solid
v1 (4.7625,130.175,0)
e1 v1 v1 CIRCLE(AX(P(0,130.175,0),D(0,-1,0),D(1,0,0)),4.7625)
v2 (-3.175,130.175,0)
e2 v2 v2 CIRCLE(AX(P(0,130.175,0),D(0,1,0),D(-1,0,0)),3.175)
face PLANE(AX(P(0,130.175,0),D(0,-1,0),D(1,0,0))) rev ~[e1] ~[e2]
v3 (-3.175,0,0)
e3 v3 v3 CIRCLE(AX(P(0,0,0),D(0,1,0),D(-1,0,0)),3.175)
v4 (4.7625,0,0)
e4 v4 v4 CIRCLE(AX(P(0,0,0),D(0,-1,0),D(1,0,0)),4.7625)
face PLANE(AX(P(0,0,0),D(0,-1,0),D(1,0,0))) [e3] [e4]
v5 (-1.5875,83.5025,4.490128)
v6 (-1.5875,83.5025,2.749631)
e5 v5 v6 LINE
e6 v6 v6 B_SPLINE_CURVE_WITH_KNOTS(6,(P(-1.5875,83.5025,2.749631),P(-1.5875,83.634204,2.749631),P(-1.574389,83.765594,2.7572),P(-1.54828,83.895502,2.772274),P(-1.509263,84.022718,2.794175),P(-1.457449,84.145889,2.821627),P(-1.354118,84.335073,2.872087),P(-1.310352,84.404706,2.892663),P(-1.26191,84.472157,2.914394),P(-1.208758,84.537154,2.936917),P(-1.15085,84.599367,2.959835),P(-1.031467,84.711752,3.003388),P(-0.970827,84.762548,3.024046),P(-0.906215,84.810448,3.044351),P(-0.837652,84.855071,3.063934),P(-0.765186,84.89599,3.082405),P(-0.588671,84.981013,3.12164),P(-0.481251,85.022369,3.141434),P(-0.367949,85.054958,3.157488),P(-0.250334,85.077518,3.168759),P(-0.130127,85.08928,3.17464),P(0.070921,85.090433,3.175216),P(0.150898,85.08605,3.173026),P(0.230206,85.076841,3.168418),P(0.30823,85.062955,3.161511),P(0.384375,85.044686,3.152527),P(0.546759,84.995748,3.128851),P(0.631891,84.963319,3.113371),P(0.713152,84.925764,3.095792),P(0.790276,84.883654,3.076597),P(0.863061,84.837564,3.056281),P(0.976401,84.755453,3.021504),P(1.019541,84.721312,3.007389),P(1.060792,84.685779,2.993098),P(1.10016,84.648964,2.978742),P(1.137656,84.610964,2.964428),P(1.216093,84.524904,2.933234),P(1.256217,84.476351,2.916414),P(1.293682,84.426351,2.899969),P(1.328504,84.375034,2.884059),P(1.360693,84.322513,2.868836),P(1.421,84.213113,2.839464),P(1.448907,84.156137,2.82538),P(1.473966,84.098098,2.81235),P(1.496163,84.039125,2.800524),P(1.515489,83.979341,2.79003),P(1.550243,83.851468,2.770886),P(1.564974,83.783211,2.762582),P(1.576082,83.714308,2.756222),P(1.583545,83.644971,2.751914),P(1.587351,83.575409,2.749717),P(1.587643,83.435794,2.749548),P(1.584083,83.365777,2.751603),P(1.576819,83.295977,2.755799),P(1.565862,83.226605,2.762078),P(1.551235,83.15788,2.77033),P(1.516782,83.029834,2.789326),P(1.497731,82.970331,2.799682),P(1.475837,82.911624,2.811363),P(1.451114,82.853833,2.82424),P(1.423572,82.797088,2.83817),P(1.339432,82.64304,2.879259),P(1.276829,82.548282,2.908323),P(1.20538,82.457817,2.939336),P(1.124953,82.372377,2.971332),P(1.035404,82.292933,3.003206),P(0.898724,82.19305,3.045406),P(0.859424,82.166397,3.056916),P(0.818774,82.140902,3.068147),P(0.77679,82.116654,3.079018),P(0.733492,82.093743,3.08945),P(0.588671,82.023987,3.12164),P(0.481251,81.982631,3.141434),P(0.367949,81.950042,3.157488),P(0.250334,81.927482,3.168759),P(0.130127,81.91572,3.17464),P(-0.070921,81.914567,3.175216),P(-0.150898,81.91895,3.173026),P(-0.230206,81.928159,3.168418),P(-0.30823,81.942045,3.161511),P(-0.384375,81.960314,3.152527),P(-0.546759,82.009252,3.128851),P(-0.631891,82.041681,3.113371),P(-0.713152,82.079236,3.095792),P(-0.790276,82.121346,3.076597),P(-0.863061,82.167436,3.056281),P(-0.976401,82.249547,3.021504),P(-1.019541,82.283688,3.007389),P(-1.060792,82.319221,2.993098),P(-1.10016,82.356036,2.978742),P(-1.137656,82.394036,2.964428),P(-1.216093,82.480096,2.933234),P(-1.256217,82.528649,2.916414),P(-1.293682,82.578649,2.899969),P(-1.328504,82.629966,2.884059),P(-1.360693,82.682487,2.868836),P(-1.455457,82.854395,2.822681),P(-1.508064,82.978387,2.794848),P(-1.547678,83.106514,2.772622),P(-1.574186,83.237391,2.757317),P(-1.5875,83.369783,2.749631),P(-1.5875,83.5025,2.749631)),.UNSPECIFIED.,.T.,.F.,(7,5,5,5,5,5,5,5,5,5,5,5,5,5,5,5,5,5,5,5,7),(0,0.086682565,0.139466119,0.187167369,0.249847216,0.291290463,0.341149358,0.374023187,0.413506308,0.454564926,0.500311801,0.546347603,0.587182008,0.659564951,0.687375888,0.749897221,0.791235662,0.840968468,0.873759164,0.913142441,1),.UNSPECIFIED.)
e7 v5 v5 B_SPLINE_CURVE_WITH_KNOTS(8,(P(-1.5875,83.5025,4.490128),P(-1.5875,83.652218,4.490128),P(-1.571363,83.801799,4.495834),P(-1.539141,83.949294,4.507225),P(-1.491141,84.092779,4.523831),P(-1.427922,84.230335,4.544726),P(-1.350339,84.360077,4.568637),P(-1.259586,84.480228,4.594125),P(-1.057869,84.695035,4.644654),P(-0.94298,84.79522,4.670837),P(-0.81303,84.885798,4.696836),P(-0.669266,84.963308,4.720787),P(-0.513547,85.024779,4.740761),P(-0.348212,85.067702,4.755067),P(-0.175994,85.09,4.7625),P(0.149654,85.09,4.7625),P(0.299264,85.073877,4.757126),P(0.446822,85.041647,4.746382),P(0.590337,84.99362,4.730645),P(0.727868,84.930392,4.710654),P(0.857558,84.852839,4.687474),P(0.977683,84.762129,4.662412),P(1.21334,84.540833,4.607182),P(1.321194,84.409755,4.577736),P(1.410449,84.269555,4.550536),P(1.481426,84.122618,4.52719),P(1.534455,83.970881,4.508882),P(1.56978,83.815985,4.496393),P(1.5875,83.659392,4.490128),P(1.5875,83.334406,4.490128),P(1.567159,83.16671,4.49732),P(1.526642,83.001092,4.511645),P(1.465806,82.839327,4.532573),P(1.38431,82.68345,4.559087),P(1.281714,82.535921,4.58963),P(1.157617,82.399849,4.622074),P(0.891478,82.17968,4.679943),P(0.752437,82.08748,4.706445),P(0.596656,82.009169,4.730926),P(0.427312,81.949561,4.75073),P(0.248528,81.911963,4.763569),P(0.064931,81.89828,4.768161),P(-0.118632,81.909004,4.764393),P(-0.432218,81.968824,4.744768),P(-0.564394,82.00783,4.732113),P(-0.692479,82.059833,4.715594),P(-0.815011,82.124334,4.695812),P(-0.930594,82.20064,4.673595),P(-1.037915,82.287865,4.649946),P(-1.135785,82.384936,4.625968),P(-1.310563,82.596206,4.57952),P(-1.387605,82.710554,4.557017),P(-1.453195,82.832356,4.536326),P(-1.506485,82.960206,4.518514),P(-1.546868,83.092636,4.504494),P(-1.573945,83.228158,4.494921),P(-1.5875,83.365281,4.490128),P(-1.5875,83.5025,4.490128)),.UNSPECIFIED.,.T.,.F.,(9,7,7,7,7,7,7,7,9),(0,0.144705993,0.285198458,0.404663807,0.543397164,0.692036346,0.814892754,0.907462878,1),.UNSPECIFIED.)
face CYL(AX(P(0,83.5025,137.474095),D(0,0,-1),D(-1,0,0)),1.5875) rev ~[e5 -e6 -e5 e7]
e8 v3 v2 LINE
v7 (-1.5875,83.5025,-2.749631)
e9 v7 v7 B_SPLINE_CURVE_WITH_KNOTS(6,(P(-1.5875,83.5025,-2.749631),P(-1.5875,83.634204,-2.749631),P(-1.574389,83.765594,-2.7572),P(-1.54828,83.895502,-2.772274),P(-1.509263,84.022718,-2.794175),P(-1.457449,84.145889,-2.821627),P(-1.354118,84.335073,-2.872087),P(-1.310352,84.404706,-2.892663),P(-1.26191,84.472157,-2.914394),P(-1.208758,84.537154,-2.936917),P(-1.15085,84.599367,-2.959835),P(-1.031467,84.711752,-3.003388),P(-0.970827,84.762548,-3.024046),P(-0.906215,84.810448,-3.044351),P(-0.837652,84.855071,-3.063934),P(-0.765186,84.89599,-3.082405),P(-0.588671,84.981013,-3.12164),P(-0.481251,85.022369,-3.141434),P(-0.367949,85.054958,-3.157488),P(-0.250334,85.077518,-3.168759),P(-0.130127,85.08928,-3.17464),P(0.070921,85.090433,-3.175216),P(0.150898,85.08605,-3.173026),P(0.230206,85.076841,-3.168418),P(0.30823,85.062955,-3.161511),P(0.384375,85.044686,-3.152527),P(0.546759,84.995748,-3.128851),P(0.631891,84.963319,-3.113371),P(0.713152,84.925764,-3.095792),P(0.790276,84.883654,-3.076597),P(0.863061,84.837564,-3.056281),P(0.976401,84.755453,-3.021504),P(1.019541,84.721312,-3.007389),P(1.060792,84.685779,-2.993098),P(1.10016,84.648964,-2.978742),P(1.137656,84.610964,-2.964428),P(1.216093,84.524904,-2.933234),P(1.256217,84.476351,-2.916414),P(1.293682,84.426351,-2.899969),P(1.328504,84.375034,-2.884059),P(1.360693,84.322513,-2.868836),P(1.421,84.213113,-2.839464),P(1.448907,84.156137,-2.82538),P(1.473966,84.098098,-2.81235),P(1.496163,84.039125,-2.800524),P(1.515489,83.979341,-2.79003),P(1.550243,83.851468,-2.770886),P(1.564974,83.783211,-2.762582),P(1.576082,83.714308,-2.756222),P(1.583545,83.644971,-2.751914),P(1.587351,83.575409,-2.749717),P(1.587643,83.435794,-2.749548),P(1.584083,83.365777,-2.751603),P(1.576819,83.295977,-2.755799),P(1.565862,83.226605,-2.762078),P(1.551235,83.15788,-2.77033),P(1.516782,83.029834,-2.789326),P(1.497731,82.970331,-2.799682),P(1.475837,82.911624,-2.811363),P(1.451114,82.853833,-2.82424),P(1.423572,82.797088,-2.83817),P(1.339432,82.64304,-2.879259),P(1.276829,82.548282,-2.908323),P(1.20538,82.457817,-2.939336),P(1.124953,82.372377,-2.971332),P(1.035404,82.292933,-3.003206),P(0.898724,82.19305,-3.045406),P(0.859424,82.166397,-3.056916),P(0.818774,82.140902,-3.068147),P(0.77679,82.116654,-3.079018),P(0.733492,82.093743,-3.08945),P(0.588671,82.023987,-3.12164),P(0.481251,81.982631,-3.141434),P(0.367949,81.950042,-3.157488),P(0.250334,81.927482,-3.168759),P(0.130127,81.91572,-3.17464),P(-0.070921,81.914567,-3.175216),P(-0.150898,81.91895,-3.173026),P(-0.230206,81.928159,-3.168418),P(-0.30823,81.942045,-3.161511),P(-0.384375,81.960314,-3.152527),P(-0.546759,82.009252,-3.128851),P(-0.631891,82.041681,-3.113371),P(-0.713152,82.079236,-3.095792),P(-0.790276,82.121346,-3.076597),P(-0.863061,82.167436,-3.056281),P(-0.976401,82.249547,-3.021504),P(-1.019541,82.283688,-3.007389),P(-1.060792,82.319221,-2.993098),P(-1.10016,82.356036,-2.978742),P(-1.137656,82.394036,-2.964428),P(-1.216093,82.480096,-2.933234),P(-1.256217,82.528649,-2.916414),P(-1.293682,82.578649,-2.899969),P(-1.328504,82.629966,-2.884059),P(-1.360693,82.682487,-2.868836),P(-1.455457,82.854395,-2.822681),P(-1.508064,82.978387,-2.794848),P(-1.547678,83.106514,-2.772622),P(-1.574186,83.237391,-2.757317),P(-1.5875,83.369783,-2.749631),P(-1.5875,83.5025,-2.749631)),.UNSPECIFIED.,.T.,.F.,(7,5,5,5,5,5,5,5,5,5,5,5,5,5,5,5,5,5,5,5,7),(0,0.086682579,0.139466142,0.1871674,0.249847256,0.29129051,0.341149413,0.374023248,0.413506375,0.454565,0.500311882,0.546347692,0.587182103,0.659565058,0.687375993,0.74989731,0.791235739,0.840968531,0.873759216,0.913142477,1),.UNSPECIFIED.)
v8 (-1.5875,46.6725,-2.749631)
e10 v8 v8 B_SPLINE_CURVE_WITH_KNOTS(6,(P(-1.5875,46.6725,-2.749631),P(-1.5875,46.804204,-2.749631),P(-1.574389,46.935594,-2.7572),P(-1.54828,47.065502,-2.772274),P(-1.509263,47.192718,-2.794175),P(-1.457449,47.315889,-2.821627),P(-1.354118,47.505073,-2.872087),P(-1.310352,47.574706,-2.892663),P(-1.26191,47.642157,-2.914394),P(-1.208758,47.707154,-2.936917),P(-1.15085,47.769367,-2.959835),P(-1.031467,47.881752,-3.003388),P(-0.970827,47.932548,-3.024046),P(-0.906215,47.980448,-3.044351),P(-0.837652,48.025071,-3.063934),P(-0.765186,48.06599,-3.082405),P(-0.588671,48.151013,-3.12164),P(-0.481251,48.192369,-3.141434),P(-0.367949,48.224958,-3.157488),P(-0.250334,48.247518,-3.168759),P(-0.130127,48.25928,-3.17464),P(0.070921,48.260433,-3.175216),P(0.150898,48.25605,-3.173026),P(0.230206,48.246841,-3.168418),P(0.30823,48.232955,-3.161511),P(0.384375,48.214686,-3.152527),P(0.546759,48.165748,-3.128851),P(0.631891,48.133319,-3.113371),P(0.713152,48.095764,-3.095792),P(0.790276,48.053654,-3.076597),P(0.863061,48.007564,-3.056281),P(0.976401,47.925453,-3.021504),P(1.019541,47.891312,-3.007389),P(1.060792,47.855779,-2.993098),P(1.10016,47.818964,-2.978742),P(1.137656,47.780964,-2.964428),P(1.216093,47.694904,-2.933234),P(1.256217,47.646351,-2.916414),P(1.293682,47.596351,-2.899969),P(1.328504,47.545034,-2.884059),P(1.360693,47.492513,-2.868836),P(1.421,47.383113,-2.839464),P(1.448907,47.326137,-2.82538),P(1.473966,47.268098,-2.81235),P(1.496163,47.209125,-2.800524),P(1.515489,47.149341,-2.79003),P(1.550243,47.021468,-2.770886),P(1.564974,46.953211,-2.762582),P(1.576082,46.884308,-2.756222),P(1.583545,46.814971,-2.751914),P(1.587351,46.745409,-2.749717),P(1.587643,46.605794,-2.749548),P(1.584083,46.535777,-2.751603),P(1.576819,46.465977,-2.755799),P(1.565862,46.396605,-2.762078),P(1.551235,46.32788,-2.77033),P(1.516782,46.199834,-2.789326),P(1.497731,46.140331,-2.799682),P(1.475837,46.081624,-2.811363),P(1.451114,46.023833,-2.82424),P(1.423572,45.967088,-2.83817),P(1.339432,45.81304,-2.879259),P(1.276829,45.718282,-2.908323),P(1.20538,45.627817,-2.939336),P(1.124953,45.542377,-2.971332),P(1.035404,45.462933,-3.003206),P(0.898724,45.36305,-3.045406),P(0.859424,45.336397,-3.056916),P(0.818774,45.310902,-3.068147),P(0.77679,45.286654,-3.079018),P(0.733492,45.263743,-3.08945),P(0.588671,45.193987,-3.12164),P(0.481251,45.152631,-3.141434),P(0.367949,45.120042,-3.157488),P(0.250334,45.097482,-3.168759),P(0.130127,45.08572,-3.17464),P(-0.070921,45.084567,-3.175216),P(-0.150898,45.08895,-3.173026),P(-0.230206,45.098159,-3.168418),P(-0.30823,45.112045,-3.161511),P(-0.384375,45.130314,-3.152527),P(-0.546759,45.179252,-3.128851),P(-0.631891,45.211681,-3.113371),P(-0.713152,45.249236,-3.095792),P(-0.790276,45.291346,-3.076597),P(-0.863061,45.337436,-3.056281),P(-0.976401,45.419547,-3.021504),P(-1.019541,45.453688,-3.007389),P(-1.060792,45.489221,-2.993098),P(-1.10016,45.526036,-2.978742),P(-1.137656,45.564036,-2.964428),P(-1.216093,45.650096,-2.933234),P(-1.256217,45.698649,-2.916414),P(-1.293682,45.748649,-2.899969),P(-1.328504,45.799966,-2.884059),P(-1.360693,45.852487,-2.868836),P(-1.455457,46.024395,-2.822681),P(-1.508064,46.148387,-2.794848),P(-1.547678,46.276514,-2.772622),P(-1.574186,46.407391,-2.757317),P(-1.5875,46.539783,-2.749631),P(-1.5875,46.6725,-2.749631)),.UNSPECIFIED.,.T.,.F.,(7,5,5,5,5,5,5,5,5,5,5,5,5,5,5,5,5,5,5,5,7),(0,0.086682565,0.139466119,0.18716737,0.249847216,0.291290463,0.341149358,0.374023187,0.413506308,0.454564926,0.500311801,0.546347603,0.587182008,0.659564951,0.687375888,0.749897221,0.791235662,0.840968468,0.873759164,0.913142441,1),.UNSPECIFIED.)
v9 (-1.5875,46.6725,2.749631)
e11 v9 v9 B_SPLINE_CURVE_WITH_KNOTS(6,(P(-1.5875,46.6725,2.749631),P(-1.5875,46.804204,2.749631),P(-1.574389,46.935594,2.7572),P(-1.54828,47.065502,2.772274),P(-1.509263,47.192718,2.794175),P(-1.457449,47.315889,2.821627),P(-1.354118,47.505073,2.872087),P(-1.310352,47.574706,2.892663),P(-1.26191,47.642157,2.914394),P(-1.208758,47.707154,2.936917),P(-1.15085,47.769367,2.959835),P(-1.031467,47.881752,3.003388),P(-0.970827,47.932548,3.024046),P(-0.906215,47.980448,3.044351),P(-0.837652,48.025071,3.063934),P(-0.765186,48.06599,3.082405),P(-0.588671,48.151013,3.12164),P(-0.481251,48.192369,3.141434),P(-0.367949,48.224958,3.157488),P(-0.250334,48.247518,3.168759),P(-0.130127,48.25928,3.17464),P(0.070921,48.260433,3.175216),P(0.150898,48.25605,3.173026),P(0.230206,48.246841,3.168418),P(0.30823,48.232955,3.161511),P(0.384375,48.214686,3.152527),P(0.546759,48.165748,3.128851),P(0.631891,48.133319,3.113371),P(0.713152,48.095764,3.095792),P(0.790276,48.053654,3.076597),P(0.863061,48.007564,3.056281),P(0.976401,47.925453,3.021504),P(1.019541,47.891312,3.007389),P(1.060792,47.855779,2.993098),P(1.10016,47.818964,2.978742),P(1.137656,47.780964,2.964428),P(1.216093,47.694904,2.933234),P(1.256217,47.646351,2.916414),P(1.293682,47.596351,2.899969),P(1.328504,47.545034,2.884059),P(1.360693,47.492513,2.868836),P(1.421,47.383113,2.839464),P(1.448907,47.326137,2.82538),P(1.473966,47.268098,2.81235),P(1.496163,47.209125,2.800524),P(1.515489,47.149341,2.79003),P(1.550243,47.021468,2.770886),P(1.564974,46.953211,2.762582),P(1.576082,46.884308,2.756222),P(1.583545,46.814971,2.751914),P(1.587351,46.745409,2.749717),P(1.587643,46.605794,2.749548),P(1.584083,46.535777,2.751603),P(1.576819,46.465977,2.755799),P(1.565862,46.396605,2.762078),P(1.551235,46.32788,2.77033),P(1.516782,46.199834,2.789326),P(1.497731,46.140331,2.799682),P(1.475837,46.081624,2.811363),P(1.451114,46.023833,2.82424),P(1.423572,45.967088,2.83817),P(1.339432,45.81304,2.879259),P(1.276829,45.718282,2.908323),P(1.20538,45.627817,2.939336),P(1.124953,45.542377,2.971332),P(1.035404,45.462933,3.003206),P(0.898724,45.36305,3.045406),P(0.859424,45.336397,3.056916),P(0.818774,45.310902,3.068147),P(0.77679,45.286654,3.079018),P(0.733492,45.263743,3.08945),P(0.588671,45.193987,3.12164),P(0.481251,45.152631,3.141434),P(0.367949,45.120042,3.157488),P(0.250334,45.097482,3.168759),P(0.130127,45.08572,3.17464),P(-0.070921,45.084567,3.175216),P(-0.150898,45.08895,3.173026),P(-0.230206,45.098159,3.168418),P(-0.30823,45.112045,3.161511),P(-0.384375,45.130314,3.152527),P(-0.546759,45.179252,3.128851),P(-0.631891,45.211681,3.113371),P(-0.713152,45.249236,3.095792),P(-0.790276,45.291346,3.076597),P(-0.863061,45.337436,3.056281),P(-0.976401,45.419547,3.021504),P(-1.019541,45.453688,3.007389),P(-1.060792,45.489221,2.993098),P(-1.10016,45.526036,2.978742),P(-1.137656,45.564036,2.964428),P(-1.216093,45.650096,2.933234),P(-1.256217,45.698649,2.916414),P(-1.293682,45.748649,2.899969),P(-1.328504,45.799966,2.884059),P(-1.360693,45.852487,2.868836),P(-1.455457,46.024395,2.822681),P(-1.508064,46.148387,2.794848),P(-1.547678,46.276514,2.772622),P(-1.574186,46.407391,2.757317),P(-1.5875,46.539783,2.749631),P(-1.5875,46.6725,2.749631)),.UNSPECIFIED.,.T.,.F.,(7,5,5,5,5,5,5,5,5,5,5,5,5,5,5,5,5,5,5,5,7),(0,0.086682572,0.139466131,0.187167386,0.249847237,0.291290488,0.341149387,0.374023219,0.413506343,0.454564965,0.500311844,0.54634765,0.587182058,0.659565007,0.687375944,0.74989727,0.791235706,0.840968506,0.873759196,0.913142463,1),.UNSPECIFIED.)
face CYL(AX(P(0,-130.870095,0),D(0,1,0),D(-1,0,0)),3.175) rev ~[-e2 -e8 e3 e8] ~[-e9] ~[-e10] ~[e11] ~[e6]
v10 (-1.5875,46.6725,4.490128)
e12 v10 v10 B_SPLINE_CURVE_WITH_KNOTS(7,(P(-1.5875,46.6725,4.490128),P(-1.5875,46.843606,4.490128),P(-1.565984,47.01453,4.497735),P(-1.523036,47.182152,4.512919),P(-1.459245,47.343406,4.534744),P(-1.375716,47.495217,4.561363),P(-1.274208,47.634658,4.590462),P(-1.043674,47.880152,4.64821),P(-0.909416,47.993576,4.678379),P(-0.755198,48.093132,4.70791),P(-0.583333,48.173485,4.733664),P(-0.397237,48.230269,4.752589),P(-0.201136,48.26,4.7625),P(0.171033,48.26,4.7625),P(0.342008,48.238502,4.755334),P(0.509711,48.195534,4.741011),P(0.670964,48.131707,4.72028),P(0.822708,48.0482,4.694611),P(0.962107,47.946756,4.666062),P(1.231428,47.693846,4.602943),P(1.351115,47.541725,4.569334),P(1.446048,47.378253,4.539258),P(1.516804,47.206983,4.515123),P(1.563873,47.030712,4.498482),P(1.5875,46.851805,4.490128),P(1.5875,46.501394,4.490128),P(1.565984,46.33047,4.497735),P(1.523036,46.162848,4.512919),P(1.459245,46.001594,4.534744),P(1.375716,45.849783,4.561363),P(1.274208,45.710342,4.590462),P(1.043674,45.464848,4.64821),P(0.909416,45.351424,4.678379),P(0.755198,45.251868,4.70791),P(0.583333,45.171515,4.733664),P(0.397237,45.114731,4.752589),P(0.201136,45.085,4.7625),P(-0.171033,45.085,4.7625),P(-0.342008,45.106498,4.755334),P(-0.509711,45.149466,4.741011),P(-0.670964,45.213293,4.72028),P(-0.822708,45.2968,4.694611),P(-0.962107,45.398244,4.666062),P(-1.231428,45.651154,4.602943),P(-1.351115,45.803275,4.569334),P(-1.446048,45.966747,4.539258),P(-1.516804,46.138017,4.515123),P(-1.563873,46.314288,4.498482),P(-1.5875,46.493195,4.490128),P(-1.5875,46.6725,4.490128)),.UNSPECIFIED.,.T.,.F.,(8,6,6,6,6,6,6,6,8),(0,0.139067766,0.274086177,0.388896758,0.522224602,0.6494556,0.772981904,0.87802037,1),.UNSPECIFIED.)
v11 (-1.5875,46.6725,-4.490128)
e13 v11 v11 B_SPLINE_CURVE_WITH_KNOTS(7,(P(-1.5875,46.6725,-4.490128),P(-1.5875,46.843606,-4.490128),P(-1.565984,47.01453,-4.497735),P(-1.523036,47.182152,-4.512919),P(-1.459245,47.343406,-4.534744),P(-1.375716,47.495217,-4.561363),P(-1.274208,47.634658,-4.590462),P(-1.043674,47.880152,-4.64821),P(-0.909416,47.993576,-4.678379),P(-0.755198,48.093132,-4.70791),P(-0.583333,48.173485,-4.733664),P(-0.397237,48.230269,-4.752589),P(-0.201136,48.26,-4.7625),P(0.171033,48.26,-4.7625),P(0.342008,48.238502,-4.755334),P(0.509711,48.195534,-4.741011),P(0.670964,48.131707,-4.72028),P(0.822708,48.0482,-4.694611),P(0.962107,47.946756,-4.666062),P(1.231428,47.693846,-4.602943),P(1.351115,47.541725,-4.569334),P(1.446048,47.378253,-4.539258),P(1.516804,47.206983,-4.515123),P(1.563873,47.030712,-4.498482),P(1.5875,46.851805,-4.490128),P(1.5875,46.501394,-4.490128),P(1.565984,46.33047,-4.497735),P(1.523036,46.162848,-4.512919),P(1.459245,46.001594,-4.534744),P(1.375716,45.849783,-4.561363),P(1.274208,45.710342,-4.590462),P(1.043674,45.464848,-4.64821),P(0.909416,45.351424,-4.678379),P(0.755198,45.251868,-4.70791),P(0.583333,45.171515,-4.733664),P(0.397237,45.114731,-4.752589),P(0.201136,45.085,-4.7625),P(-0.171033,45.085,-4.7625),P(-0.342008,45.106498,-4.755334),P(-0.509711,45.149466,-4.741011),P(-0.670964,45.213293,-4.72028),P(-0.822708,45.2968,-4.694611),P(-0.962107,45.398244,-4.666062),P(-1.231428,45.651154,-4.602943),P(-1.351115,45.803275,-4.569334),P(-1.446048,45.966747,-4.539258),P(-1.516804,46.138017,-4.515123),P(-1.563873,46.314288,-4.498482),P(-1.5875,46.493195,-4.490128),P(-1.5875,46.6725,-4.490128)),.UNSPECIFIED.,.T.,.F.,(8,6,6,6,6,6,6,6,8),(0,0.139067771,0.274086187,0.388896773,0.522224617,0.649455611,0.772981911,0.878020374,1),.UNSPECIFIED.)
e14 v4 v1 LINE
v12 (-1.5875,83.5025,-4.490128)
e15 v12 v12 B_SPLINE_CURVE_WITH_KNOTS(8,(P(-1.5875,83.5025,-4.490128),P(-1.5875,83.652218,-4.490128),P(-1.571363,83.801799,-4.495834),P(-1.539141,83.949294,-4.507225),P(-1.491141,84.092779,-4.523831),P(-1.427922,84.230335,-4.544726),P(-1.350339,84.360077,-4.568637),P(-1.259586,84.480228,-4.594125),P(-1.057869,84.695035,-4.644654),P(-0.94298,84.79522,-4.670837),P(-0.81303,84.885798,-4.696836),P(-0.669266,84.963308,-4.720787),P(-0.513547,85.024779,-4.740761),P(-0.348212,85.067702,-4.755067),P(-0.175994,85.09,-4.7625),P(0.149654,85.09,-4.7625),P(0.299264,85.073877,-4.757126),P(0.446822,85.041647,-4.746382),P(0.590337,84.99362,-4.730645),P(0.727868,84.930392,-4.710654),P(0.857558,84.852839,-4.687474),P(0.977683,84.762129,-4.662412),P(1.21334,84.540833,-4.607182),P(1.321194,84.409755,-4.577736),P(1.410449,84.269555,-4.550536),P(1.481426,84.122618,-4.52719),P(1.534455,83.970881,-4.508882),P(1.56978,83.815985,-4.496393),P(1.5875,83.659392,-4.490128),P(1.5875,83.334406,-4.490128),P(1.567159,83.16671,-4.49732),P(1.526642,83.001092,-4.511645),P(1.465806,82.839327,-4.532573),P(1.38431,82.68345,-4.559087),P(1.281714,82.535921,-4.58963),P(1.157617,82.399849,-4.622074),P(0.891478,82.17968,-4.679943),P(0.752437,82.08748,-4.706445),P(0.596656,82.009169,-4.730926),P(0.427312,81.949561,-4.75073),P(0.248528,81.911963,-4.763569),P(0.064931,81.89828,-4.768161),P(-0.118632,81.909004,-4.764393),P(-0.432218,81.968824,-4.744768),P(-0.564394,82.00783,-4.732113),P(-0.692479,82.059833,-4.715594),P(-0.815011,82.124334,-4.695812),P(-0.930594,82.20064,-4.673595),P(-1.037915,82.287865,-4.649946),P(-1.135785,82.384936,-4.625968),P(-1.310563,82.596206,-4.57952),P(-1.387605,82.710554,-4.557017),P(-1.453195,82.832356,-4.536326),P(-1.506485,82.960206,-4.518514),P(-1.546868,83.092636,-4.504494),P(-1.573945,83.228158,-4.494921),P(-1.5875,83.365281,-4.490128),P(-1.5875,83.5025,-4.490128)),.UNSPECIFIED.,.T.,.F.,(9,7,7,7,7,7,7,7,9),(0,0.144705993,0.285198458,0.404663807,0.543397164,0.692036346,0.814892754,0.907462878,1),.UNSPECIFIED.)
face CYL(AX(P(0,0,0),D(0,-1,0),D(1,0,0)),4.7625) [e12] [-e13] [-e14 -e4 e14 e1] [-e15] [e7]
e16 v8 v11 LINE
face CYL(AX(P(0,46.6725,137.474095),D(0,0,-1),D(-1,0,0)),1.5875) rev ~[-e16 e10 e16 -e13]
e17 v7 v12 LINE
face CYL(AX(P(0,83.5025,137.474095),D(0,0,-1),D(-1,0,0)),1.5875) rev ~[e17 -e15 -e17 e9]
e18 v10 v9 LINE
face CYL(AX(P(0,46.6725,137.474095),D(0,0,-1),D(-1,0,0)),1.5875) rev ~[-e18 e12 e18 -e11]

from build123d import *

# Parameters (mm, degrees)
F0_R        = 4.7625
F1_DEPTH    = 130.175
F3_D        = 6.35
F4_W        = 9.525
F4_H        = 9.525
F5_DEPTH    = 130.175
F7_D        = 3.175
F8_T1_DEPTH = 155.575
F11_D       = 3.175


# Not quite as in the source:
# - a fillet or chamfer that OpenCascade refuses, or shapes differently, is made with other operations: its cross-section is extruded or revolved along the edge and cut away or added


with BuildPart() as f1:
    # F0 (on Front) → F1 (new body)
    with BuildSketch(Plane.XZ):
        Circle(F0_R)
    extrude(amount=-F1_DEPTH)

    # F3 (through all)
    with Locations(Plane.XZ):
        with Locations((0, 0)):
            Hole(F3_D / 2)

    # F11 (through all)
    with Locations(Plane.XY.offset(6.604)):
        with Locations((0, 83.5025), (0, 46.6725)):
            Hole(F11_D / 2)


with BuildPart() as f5:
    # F4 (on Front) → F5 (new body)
    with BuildSketch(Plane.XZ):
        with Locations((196.4227657549, 4.7625)):
            Rectangle(F4_W, F4_H)
    extrude(amount=-F5_DEPTH)

    # F7 (through all)
    with Locations(Plane.XY.offset(9.525)):
        with Locations((196.4227657549, 83.5025), (196.4227657549, 46.6725)):
            Hole(F7_D / 2)

    # F8: fillet of radius 5.08 on 4 edges, made by hand

    # F8_s2 → F8_t1 (cut)
    with BuildSketch(Plane.XZ.offset(-142.875)):
        with BuildLine():
            ThreePointArc((196.1052657549, 9.525), (199.6973682033, 8.0371024484), (201.1852657549, 4.445))
            Line((201.1852657549, 4.445), (201.1852657549, 9.525))
            Line((201.1852657549, 9.525), (196.1052657549, 9.525))
        make_face()
        with BuildLine():
            ThreePointArc((191.6602657549, 4.445), (193.1481633065, 8.0371024484), (196.7402657549, 9.525))
            Line((196.7402657549, 9.525), (191.6602657549, 9.525))
            Line((191.6602657549, 9.525), (191.6602657549, 4.445))
        make_face()
        with BuildLine():
            ThreePointArc((196.1052657549, 0), (199.6973682033, 1.4878975516), (201.1852657549, 5.08))
            Line((201.1852657549, 5.08), (201.1852657549, 0))
            Line((201.1852657549, 0), (196.1052657549, 0))
        make_face()
        with BuildLine():
            ThreePointArc((191.6602657549, 5.08), (193.1481633065, 1.4878975516), (196.7402657549, 0))
            Line((196.7402657549, 0), (191.6602657549, 0))
            Line((191.6602657549, 0), (191.6602657549, 5.08))
        make_face()
    extrude(amount=F8_T1_DEPTH, mode=Mode.SUBTRACT)


solid = f1.part
